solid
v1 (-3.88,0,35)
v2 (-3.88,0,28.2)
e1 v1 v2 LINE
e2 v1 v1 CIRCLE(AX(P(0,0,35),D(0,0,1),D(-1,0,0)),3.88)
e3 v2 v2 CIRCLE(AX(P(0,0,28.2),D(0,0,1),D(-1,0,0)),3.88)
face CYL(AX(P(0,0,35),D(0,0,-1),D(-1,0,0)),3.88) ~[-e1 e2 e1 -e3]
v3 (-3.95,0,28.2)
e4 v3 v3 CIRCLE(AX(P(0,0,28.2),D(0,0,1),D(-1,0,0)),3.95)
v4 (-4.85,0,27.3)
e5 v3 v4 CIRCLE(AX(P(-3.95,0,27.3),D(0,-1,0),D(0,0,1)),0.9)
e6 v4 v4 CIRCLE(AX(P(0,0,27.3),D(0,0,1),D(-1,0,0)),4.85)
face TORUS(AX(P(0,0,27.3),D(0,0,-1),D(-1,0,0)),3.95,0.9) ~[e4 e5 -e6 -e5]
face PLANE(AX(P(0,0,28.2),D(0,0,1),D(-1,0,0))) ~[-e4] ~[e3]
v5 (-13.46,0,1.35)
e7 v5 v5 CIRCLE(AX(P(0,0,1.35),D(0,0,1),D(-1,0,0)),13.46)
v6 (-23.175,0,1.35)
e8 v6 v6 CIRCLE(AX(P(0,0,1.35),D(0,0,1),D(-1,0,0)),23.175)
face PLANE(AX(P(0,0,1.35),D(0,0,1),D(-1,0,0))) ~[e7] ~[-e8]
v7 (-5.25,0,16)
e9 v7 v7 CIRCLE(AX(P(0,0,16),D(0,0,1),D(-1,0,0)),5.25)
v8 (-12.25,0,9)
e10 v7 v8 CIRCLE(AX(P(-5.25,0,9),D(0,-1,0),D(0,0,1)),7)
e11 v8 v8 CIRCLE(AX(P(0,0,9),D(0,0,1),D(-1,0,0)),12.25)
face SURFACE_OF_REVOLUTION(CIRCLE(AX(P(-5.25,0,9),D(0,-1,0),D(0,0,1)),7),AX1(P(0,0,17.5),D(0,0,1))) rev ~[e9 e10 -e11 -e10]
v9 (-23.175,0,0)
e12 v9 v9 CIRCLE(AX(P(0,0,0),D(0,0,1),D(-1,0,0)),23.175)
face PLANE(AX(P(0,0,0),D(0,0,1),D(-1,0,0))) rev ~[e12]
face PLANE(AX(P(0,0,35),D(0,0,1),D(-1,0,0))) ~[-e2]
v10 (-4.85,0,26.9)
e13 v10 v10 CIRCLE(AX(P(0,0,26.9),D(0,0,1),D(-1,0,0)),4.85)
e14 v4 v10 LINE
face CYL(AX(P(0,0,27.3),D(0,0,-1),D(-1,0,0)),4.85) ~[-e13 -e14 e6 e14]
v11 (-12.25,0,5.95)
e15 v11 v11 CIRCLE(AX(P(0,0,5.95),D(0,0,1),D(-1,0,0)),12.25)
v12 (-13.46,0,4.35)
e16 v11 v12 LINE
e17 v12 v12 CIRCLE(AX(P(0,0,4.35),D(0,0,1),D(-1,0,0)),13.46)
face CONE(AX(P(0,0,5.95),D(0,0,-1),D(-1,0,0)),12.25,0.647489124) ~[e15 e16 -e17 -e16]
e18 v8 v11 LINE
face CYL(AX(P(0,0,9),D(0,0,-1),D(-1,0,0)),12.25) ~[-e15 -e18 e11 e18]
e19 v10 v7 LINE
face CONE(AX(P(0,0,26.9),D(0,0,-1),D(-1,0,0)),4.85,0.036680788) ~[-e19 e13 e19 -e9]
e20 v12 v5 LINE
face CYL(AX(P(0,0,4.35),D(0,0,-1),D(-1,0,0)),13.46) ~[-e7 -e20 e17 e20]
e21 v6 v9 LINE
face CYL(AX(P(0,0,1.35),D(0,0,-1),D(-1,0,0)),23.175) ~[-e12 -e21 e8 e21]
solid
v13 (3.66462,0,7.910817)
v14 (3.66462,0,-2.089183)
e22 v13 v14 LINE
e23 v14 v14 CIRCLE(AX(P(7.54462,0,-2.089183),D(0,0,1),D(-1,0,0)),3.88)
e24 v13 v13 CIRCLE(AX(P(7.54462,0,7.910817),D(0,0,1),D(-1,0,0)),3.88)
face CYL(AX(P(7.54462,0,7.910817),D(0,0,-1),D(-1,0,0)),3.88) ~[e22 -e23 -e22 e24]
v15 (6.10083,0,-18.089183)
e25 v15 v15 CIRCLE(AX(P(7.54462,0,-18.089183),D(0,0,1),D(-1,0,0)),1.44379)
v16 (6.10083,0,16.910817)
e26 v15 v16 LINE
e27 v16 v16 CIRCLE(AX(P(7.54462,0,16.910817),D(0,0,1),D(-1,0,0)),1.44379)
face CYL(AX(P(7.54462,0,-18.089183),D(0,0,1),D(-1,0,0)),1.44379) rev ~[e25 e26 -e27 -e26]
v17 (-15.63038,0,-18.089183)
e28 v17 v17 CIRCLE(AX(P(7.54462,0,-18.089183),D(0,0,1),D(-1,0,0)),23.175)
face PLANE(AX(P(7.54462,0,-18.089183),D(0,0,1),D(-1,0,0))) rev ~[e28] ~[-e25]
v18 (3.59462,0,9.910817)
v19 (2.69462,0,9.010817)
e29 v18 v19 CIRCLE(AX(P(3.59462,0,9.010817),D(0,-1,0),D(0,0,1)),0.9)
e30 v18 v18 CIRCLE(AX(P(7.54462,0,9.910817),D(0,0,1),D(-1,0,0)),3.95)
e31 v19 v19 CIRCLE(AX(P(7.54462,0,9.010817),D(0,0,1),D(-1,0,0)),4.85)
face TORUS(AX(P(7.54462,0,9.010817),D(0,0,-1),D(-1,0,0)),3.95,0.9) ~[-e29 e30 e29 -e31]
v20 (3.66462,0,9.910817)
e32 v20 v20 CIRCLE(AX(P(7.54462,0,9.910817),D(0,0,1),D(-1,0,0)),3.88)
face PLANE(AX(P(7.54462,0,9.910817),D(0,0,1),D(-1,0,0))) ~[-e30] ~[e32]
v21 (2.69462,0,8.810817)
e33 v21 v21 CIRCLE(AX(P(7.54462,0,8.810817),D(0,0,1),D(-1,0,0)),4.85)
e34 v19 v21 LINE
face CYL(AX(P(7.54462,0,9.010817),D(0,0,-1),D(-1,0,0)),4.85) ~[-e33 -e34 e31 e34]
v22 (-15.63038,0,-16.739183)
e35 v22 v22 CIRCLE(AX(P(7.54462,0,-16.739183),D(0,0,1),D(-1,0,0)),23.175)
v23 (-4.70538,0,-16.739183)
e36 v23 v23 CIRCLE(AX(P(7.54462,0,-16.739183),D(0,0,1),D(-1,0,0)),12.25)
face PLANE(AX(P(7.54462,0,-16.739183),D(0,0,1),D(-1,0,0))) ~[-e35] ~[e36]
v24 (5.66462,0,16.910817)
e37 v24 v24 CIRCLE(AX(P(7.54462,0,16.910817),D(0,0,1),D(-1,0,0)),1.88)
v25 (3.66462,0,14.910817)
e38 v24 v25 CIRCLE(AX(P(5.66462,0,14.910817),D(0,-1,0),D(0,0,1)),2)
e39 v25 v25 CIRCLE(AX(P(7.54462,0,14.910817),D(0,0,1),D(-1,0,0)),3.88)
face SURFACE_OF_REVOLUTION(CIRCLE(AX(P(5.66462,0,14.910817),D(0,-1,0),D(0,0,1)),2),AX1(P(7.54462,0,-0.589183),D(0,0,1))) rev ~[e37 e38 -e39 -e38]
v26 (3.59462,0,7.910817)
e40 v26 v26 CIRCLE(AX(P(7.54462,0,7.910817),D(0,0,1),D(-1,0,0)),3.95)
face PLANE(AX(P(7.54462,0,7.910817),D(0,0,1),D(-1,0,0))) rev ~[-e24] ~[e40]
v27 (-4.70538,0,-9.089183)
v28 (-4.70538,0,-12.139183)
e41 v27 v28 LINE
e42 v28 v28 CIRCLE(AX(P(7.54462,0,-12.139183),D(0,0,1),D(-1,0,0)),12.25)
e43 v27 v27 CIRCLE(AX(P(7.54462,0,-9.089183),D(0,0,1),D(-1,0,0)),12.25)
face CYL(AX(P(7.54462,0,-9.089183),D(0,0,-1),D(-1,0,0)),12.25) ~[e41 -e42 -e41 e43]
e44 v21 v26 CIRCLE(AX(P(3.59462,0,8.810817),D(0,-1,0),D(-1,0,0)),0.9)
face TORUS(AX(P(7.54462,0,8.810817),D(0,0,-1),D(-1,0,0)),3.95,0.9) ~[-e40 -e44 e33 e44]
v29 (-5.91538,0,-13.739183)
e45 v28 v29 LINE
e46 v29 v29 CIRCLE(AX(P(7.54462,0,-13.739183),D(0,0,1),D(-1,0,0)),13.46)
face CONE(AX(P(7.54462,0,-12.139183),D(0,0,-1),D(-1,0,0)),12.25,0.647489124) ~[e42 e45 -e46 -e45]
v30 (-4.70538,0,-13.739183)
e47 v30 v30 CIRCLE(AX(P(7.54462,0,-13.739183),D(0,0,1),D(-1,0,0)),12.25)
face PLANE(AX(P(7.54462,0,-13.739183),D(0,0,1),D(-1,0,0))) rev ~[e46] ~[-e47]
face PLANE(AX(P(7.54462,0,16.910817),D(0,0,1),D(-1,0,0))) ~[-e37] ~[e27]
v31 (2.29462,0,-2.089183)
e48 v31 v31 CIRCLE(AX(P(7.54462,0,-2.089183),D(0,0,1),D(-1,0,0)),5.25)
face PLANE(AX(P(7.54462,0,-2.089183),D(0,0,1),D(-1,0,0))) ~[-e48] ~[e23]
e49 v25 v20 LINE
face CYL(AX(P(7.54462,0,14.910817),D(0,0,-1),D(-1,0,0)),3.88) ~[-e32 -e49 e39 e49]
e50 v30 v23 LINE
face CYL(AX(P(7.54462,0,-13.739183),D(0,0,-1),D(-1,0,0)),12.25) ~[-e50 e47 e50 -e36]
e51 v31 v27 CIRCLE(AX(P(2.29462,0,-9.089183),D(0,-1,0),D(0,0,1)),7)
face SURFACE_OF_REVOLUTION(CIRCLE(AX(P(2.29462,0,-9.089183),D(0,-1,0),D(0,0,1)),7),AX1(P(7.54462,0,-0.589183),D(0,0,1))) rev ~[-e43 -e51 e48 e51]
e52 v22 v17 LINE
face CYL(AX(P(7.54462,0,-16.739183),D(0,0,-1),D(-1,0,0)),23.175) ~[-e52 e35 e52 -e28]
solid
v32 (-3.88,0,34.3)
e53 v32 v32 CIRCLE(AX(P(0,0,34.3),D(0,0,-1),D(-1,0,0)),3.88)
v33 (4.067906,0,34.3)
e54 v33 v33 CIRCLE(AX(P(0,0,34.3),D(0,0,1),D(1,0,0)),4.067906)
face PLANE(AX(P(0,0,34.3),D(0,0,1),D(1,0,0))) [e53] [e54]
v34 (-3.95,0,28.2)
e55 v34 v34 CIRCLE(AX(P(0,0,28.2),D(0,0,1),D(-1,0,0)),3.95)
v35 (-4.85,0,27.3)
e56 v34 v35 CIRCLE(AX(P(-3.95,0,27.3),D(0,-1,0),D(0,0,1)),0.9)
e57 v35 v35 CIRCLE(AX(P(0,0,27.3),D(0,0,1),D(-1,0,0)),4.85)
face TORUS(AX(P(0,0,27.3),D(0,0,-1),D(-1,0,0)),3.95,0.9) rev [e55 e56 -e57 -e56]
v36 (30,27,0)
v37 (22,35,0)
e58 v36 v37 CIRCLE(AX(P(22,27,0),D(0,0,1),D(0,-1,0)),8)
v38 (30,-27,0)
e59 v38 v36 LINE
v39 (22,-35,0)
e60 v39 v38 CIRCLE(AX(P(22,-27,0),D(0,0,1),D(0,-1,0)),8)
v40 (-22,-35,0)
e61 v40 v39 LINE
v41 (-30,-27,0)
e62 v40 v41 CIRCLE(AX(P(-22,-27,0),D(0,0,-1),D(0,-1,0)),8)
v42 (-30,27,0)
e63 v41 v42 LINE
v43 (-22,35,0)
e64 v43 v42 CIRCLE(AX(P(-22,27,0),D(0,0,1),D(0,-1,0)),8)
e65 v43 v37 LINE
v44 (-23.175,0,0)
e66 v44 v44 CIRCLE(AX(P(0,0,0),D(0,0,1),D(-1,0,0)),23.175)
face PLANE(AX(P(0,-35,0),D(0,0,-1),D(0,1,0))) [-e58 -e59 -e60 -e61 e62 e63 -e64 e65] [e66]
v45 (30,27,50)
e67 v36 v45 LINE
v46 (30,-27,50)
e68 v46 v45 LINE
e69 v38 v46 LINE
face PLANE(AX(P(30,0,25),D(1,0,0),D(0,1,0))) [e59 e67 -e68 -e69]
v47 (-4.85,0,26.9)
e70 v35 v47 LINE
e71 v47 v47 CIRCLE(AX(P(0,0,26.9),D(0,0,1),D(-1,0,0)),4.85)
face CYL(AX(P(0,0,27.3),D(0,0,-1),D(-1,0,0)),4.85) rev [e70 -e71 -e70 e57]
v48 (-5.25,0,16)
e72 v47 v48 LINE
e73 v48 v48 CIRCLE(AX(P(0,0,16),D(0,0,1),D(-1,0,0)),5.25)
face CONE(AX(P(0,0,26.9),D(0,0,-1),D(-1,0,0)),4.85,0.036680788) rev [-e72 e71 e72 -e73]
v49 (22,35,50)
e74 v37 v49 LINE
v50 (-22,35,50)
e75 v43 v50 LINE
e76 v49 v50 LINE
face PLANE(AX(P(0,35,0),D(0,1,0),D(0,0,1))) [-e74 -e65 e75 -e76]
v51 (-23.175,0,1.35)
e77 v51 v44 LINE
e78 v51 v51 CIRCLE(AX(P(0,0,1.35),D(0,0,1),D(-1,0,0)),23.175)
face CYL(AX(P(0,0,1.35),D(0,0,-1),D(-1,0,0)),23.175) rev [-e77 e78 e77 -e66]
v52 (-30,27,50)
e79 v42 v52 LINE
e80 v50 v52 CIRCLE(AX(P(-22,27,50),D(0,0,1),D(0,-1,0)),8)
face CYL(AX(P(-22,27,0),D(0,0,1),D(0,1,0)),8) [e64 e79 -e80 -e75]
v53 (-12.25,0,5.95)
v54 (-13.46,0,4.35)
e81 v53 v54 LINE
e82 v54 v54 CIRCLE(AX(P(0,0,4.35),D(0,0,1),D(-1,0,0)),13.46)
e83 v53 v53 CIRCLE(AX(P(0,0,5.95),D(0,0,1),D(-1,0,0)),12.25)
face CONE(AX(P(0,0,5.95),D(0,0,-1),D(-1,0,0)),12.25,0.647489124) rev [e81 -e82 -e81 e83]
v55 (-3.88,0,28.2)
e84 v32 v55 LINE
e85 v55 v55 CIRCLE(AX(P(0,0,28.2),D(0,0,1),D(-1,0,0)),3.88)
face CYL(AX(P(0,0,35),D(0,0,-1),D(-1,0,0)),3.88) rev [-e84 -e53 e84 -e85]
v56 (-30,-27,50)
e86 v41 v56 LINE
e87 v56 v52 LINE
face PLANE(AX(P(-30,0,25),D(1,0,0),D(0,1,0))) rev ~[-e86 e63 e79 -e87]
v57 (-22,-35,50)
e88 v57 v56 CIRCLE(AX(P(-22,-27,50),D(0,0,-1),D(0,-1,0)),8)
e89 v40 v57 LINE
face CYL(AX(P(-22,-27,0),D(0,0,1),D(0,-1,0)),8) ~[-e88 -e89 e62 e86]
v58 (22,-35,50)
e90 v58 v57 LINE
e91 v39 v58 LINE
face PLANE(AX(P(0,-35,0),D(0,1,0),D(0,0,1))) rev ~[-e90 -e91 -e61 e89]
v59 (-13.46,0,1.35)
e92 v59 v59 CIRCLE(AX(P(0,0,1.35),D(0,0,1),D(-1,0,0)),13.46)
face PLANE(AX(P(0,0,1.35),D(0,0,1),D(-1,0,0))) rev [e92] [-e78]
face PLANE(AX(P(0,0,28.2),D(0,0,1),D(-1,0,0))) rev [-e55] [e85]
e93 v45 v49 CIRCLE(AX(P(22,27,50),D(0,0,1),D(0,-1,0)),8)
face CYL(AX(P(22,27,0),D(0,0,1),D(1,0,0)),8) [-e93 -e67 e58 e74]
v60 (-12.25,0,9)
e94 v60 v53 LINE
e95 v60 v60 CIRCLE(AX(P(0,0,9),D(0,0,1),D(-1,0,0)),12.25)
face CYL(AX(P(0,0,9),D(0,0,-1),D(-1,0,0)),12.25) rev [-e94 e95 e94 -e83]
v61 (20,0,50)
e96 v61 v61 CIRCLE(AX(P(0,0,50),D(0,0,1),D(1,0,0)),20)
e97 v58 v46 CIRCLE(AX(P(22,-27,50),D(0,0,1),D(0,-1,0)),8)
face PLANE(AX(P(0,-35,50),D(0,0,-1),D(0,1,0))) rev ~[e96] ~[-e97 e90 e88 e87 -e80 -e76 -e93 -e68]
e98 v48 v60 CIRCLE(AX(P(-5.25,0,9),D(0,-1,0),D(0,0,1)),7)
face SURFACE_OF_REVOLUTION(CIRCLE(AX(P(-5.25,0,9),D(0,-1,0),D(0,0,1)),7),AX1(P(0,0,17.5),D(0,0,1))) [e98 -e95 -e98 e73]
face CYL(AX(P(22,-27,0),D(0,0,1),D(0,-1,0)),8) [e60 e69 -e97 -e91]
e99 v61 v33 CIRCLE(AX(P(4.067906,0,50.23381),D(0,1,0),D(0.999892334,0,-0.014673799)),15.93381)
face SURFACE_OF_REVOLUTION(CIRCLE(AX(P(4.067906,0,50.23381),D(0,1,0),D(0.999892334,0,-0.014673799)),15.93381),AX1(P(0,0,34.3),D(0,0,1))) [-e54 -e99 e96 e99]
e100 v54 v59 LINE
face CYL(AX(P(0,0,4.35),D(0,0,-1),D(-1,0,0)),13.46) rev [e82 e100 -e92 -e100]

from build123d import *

# Parameters (mm, degrees)
F2_W     = 70
F2_H     = 50
F3_DEPTH = 30
F4_R     = 8
F6_R     = 20
F7_DEPTH = 15.7


# Not quite as in the source:
# - a fillet or chamfer that OpenCascade refuses, or shapes differently, is made with other operations: its cross-section is extruded or revolved along the edge and cut away or added


with BuildPart() as f1:
    # F0 (on Front) → F1 (revolve)
    with BuildSketch(Plane.XZ):
        with BuildLine():
            Line((-23.175, 0), (0, 0))
            Line((0, 0), (0, 35))
            Line((0, 35), (-1.88, 35))
            Line((-1.88, 35), (-3.88, 35))
            Line((-3.88, 35), (-3.88, 28.2))
            Line((-3.88, 28.2), (-3.95, 28.2))
            ThreePointArc((-3.95, 28.2), (-4.5863961031, 27.9363961031), (-4.85, 27.3))
            Line((-4.85, 27.3), (-4.85, 27.1))
            Line((-4.85, 27.1), (-4.85, 26.9))
            ThreePointArc((-4.85, 26.9), (-4.5863961031, 26.2636038969), (-3.95, 26))
            Line((-3.95, 26), (-3.88, 26))
            Line((-3.88, 26), (-3.88, 16))
            Line((-3.88, 16), (-5.25, 16))
            ThreePointArc((-5.25, 16), (-10.1997474683, 13.9497474683), (-12.25, 9))
            Line((-12.25, 9), (-12.25, 5.95))
            Line((-12.25, 5.95), (-12.25, 4.35))
            Line((-12.25, 4.35), (-12.25, 1.35))
            Line((-12.25, 1.35), (-13.46, 1.35))
            Line((-13.46, 1.35), (-23.175, 1.35))
            Line((-23.175, 1.35), (-23.175, 0))
        make_face()
        Polygon((-13.46, 4.35), (-13.46, 1.35), (-12.25, 1.35), (-12.25, 4.35), (-12.25, 5.95), align=None)
        with BuildLine():
            Line((-4.85, 26.9), (-5.25, 16))
            Line((-5.25, 16), (-3.88, 16))
            Line((-3.88, 16), (-3.88, 26))
            Line((-3.88, 26), (-3.95, 26))
            ThreePointArc((-3.95, 26), (-4.5863961031, 26.2636038969), (-4.85, 26.9))
        make_face()
    revolve(axis=Axis((0, 0, 17.5), (0, 0, 1)))


with BuildPart() as f3:
    # F2 (on Right) → F3 (new body, symmetric)
    with BuildSketch(Plane.YZ):
        with Locations((0, 25)):
            Rectangle(F2_W, F2_H)
    extrude(amount=F3_DEPTH, both=True)

    # F4
    f4_edges = [f3.edges().sort_by_distance(p)[0] for p in [
        (30, -35, 25),
        (30, 35, 25),
        (-30, -35, 25),
        (-30, 35, 25),
    ]]
    fillet(f4_edges, radius=F4_R)

    # F5: cut F1
    add(f1.part, mode=Mode.SUBTRACT)

    # F6 (on face) → F7 (cut)
    with BuildSketch(Plane.XY.offset(50)):
        Circle(F6_R)
    extrude(amount=-F7_DEPTH, mode=Mode.SUBTRACT)

    # F8: fillet of radius 15.9338095117 on 1 edges, made by hand

    # F8_s1 → F8_t2 (revolve)
    with BuildSketch(Plane.XZ):
        with BuildLine():
            ThreePointArc((20, 50), (15.251841133, 38.8845416548), (4.0679060175, 34.3))
            Line((4.0679060175, 34.3), (20, 34.3))
            Line((20, 34.3), (20, 50))
        make_face()
    revolve(axis=Axis((0, 0, 34.3), (0, 0, 1)))


with BuildPart() as f10:
    # F9 (on Front) → F10 (revolve)
    with BuildSketch(Plane.XZ):
        with BuildLine():
            Line((-15.6303802583, -18.0891831181), (6.1008301564, -18.0891831181))
            Line((6.1008301564, -18.0891831181), (6.1008301564, 16.9108168819))
            Line((6.1008301564, 16.9108168819), (5.6646197417, 16.9108168819))
            ThreePointArc((5.6646197417, 16.9108168819), (4.2504061793, 16.3250304443), (3.6646197417, 14.9108168819))
            Line((3.6646197417, 14.9108168819), (3.6646197417, 9.9108168819))
            Line((3.6646197417, 9.9108168819), (3.5946197417, 9.9108168819))
            ThreePointArc((3.5946197417, 9.9108168819), (2.9582236386, 9.647212985), (2.6946197417, 9.0108168819))
            Line((2.6946197417, 9.0108168819), (2.6946197417, 8.8108168819))
            ThreePointArc((2.6946197417, 8.8108168819), (2.9582236386, 8.1744207789), (3.5946197417, 7.9108168819))
            Line((3.5946197417, 7.9108168819), (3.6646197417, 7.9108168819))
            Line((3.6646197417, 7.9108168819), (3.6646197417, -2.0891831181))
            Line((3.6646197417, -2.0891831181), (2.2946197417, -2.0891831181))
            ThreePointArc((2.2946197417, -2.0891831181), (-2.6551277266, -4.1394356497), (-4.7053802583, -9.0891831181))
            Line((-4.7053802583, -9.0891831181), (-4.7053802583, -12.1391831181))
            Line((-4.7053802583, -12.1391831181), (-5.9153802583, -13.7391831181))
            Line((-5.9153802583, -13.7391831181), (-4.7053802583, -13.7391831181))
            Line((-4.7053802583, -13.7391831181), (-4.7053802583, -16.7391831181))
            Line((-4.7053802583, -16.7391831181), (-15.6303802583, -16.7391831181))
            Line((-15.6303802583, -16.7391831181), (-15.6303802583, -18.0891831181))
        make_face()
    revolve(axis=Axis((7.5446197417, 0, -0.5891831181), (0, 0, 1)))


solid = Compound([f1.part, f3.part, f10.part])
